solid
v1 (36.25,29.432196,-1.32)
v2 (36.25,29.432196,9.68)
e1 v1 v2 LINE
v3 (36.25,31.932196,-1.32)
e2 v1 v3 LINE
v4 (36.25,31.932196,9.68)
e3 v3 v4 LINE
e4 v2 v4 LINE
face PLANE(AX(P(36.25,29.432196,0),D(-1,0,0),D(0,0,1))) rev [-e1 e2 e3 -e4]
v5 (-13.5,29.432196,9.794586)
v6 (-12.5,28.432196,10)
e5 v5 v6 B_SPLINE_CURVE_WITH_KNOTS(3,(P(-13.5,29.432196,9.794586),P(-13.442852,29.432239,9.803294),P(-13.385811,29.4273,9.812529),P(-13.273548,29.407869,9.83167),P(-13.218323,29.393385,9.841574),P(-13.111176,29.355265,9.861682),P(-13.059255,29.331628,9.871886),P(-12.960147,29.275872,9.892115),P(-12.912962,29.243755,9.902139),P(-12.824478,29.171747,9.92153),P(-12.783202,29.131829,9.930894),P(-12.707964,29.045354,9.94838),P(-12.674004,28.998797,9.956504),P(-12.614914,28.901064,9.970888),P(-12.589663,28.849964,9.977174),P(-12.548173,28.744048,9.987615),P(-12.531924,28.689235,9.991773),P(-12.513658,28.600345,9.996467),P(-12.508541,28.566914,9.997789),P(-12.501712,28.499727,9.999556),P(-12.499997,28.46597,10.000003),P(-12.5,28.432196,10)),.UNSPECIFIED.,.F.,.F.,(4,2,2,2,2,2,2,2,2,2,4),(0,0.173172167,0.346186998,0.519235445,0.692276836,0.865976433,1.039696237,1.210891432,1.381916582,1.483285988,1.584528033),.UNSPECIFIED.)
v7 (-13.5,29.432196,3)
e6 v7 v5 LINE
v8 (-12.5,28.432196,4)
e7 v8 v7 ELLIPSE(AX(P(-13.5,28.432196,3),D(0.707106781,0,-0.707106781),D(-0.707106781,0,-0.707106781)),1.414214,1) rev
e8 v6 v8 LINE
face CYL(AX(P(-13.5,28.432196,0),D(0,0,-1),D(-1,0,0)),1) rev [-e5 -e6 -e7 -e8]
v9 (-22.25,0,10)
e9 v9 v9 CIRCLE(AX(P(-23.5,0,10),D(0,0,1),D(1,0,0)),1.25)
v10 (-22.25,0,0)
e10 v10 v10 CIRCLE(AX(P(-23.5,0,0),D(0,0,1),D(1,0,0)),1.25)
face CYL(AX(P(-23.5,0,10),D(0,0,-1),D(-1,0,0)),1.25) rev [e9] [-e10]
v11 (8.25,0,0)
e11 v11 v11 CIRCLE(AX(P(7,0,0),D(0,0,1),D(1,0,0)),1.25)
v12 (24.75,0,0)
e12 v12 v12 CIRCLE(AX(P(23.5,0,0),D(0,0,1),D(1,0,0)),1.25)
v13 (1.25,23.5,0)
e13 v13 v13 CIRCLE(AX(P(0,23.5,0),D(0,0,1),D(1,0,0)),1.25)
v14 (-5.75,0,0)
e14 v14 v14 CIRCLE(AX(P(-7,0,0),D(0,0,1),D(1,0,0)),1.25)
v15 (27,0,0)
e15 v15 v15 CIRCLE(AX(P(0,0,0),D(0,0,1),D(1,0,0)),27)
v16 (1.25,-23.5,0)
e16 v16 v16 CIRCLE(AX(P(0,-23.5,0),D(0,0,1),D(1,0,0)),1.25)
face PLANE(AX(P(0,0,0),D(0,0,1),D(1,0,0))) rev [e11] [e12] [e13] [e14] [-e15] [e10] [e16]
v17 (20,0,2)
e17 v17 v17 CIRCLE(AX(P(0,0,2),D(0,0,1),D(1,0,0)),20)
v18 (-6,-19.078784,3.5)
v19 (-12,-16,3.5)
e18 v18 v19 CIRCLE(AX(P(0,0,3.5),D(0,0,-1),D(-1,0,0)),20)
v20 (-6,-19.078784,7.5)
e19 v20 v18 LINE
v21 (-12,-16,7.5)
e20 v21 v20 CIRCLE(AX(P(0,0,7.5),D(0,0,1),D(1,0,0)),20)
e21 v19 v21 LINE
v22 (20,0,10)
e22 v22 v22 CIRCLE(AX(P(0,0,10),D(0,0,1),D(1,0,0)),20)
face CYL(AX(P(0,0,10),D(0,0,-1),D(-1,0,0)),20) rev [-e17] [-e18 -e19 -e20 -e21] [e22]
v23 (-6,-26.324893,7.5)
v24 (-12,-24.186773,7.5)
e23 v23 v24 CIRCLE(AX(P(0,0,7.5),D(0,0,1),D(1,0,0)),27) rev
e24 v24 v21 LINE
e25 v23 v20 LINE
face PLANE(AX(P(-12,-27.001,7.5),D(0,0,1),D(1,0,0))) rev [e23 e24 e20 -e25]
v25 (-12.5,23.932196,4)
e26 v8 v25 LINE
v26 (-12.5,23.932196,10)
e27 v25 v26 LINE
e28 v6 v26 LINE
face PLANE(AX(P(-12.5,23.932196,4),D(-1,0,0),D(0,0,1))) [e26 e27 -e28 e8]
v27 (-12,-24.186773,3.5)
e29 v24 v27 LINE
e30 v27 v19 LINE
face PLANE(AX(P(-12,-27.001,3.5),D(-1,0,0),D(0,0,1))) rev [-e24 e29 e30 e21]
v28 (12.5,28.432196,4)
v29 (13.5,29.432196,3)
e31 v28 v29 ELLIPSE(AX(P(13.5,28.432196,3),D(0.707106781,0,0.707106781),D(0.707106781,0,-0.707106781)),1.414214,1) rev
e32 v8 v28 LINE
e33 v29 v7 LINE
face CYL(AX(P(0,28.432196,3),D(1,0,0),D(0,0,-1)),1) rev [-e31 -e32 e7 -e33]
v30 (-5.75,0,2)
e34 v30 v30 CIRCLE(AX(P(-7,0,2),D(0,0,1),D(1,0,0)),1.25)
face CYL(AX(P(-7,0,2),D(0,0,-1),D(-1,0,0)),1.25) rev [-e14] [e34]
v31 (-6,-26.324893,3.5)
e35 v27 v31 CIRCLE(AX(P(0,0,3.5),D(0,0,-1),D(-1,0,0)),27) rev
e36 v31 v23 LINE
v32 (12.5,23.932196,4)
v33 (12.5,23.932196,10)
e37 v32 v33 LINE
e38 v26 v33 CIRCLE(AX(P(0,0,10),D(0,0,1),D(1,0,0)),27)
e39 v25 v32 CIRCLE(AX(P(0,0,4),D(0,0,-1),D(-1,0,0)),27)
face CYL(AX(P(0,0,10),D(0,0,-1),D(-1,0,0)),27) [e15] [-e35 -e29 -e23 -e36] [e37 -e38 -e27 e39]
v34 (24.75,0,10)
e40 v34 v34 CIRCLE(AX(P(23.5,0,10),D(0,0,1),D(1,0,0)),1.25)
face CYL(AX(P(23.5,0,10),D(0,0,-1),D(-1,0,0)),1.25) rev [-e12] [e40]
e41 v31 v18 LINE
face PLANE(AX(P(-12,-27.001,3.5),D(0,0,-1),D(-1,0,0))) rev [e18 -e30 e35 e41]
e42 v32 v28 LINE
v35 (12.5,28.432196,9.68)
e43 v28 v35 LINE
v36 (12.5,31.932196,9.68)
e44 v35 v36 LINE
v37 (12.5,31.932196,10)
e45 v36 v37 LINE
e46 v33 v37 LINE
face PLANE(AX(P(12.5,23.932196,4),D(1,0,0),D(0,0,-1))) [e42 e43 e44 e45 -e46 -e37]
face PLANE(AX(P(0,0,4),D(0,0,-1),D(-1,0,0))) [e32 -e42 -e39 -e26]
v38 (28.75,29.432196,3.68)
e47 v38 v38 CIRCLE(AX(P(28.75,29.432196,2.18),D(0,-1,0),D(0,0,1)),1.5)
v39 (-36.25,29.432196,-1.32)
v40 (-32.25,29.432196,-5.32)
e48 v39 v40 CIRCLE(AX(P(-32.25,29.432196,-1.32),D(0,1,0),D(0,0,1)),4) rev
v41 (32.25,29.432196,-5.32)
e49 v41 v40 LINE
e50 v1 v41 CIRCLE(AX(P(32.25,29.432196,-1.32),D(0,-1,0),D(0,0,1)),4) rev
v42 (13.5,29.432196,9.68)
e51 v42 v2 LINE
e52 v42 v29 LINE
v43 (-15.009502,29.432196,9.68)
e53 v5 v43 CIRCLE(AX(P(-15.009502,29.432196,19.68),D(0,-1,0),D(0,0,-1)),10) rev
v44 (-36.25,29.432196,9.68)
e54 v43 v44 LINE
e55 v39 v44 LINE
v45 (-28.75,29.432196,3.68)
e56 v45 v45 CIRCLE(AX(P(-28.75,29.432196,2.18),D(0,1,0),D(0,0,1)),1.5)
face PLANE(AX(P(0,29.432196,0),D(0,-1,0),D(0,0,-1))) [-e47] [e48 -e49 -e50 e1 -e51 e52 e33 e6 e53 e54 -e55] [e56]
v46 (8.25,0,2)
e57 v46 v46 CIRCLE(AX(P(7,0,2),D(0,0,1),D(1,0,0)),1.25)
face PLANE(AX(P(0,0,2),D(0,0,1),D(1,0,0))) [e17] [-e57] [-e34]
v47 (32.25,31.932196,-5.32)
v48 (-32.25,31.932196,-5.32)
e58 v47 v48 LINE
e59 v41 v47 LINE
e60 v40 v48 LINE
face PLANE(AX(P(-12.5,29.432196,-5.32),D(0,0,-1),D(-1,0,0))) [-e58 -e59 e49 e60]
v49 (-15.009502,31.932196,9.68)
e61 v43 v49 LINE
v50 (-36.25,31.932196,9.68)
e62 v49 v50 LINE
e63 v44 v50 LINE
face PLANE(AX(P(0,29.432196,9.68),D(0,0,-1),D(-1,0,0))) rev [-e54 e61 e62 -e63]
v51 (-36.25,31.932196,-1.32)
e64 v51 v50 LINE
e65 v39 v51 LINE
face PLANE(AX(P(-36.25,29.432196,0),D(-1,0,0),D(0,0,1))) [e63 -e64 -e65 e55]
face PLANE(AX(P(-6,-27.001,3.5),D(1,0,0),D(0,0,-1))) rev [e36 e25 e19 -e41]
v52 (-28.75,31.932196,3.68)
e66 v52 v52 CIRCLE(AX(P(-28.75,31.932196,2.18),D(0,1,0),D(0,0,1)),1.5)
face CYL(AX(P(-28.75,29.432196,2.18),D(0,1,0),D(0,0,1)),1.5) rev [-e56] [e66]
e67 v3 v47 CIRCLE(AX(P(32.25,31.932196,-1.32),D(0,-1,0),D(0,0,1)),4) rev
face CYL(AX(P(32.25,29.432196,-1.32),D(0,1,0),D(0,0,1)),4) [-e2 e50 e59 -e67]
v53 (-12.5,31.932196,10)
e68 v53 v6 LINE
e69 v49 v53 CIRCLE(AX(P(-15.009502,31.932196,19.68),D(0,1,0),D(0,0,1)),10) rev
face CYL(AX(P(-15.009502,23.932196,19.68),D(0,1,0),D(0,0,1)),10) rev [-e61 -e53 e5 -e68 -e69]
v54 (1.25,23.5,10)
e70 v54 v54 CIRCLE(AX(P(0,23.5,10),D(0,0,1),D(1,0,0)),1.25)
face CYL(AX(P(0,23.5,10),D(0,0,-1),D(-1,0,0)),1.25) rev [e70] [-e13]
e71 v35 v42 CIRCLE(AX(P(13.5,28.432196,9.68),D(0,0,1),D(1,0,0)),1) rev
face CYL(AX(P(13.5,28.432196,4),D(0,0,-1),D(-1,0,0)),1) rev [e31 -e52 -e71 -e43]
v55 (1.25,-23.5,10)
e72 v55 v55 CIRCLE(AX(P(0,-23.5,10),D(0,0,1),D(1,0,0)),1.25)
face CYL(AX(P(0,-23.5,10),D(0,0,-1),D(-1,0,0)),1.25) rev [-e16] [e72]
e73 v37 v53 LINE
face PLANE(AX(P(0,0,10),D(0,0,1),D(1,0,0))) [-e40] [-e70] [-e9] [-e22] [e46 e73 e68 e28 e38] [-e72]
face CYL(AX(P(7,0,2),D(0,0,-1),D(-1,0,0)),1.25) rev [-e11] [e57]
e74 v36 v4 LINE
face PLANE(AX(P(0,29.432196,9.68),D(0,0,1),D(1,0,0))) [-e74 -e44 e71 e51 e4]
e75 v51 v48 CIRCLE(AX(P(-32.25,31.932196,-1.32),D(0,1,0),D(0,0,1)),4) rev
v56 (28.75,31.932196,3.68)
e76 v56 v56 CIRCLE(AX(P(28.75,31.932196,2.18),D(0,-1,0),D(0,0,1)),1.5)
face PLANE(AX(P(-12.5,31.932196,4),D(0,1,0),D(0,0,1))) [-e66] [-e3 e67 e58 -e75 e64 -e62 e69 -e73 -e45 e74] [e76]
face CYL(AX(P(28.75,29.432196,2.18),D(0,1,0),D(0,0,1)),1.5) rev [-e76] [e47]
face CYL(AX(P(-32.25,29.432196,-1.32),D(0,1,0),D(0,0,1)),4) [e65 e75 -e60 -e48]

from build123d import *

# Parameters (mm, degrees)
SKETCH1_R               = 27
SKETCH1_R_2             = 1.25
SKETCH1_R_3             = 20
BOSS_EXTRUDE1_DEPTH     = 10
SKETCH3_R               = 20
SKETCH3_R_2             = 1.25
BOSS_EXTRUDE2_DEPTH     = 2
BOSS_EXTRUDE3_DEPTH     = 6
CUT_EXTRUDE1_REACH      = 44.996
CUT_EXTRUDE1_END_RADIUS = 27
SKETCH4_W               = 6
SKETCH4_H               = 4
SKETCH6_W               = 25
SKETCH6_H               = 15.32
BOSS_EXTRUDE4_DEPTH     = 2.5
SKETCH7_R               = 1.5
BOSS_EXTRUDE5_DEPTH     = 2.5
FILLET2_R               = 10
FILLET3_R               = 1


with BuildPart() as part:
    # Sketch1 → Boss-Extrude1 (new body)
    with BuildSketch(Plane.XY):
        Circle(SKETCH1_R)
        with Locations((0, 23.5)):
            Circle(SKETCH1_R_2, mode=Mode.SUBTRACT)
        with Locations((23.5, 0)):
            Circle(SKETCH1_R_2, mode=Mode.SUBTRACT)
        with Locations((0, -23.5)):
            Circle(SKETCH1_R_2, mode=Mode.SUBTRACT)
        with Locations((-23.5, 0)):
            Circle(SKETCH1_R_2, mode=Mode.SUBTRACT)
        Circle(SKETCH1_R_3, mode=Mode.SUBTRACT)
    extrude(amount=BOSS_EXTRUDE1_DEPTH)

    # Sketch3 → Boss-Extrude2 (add)
    with BuildSketch(Plane.XY):
        Circle(SKETCH3_R)
        with Locations((-7, 0)):
            Circle(SKETCH3_R_2, mode=Mode.SUBTRACT)
        with Locations((7, 0)):
            Circle(SKETCH3_R_2, mode=Mode.SUBTRACT)
    extrude(amount=BOSS_EXTRUDE2_DEPTH)

    # Sketch5 → Boss-Extrude3 (add)
    with BuildSketch(Plane.XY.offset(10)):
        Polygon((-12.5, 23.932195888), (-4.251935746, 23.932195888), (0, 26.25446737), (4.267780323, 23.932195888), (12.5, 23.932195888), (12.5, 31.932195888), (-12.5, 31.932195888), align=None)
    extrude(amount=-BOSS_EXTRUDE3_DEPTH)

    # Cut-Extrude1: up to this cylinder (the profile starts inside it)
    cut_extrude1_end = Plane(origin=(0, 0, 5.5), z_dir=(0, 0, -1)) * Cylinder(CUT_EXTRUDE1_END_RADIUS, 144.992, mode=Mode.PRIVATE)
    # Sketch4 → Cut-Extrude1 (cut, up to the surface)
    with BuildSketch(Plane(origin=(0, 0, 0), x_dir=(1, 0, 0), z_dir=(0, 1, 0)), mode=Mode.PRIVATE) as cut_extrude1_sk1:
        with Locations((-9, -5.5)):
            Rectangle(SKETCH4_W, SKETCH4_H)
    cut_extrude1_tool1 = extrude(cut_extrude1_sk1.sketch, amount=-CUT_EXTRUDE1_REACH, mode=Mode.PRIVATE) & cut_extrude1_end
    add(cut_extrude1_tool1.solids().sort_by_distance((-9, 0, 5.5))[0], mode=Mode.SUBTRACT)

    # Sketch6 → Boss-Extrude4 (add)
    with BuildSketch(Plane(origin=(0, 31.932195888, 0), x_dir=(1, 0, 0), z_dir=(0, 1, 0))):
        with Locations((0, -2.34)):
            Rectangle(SKETCH6_W, SKETCH6_H)
    boss_extrude4 = extrude(amount=-BOSS_EXTRUDE4_DEPTH)

    # Sketch7 → Boss-Extrude5 (add)
    with BuildSketch(Plane(origin=(0, 31.932195888, 0), x_dir=(1, 0, 0), z_dir=(0, 1, 0))):
        with BuildLine():
            Line((-36.25, -9.68), (-28.75, -9.68))
            Line((-28.75, -9.68), (0, -9.68))
            Line((0, -9.68), (0, 5.32))
            Line((0, 5.32), (-32.25, 5.32))
            ThreePointArc((-32.25, 5.32), (-35.078427125, 4.148427125), (-36.25, 1.32))
            Line((-36.25, 1.32), (-36.25, -2.18))
            Line((-36.25, -2.18), (-36.25, -9.68))
        make_face()
        with Locations(Location((-28.75, -2.18, 0), (0, 0, 270))):
            Circle(SKETCH7_R, mode=Mode.SUBTRACT)
    boss_extrude5 = extrude(amount=-BOSS_EXTRUDE5_DEPTH)

    # Fillet2
    # the kernel refuses this fillet: 10 mm, written as the material it adds along each edge
    with BuildSketch(Plane(origin=(-12.5, 29.432195888, 9.68), x_dir=(-1, 0, 0), z_dir=(0, 1, 0))) as fillet2_piece_1:
        with BuildLine():
            CenterArc((2.509501943, 10), FILLET2_R, 255.466253099, 14.533746901)
            Line((0, 0.32), (-0.050190039, 0.1264))
            ThreePointArc((-0.050190039, 0.1264), (-0.2, 0.16), (-0.2, 0))
            Line((-0.2, 0), (0, -0.2))
            Line((0, -0.2), (2.509501943, -0.2))
            Line((2.509501943, -0.2), (2.509501943, 0))
        make_face()
    extrude(amount=2.5)

    # Mirror1: Boss-Extrude4, Boss-Extrude5 across plane
    add(boss_extrude4.mirror(Plane(origin=(0, 0, 0), x_dir=(0, 0, 1), z_dir=(1, 0, 0))))
    add(boss_extrude5.mirror(Plane(origin=(0, 0, 0), x_dir=(0, 0, 1), z_dir=(1, 0, 0))))

    # Fillet3
    # the kernel refuses this fillet: 1 mm, written as the material it adds along each edge
    with BuildSketch(Plane(origin=(-12.5, 29.432195888, 4), x_dir=(0, -1, 0), z_dir=(0, 0, 1))) as fillet3_piece_1_section:
        with BuildLine():
            CenterArc((FILLET3_R, -FILLET3_R), FILLET3_R, 90, 90)
            Line((0, -FILLET3_R), (0, 0))
            Line((0, 0), (FILLET3_R, 0))
        make_face()
    fillet3_piece_1 = extrude(amount=6, mode=Mode.PRIVATE)
    fillet3_piece_1 = fillet3_piece_1 - Plane(origin=(-15.009501943, 29.204760134, 19.68), x_dir=(-1, 0, 0), z_dir=(0, -1, 0)) * Cylinder(10, 16, mode=Mode.PRIVATE)
    add(fillet3_piece_1)
    with BuildSketch(Plane(origin=(12.5, 29.432195888, 9.68), x_dir=(0, -1, 0), z_dir=(0, 0, -1))) as fillet3_piece_2:
        with BuildLine():
            CenterArc((FILLET3_R, -FILLET3_R), FILLET3_R, 90, 90)
            Line((0, -FILLET3_R), (0, 0))
            Line((0, 0), (FILLET3_R, 0))
        make_face()
    extrude(amount=5.68)
    with BuildSketch(Plane(origin=(12.5, 29.432195888, 4), x_dir=(0, -1, 0), z_dir=(-1, 0, 0))) as fillet3_piece_3:
        with BuildLine():
            CenterArc((FILLET3_R, -FILLET3_R), FILLET3_R, 90, 90)
            Line((0, -FILLET3_R), (0, 0))
            Line((0, 0), (FILLET3_R, 0))
        make_face()
    extrude(amount=25)
    with BuildSketch(Plane(origin=(-12.5, 29.432195888, 1.5), x_dir=(0, -1, 0), z_dir=(0, 0, 1))) as fillet3_piece_4a_section:
        with BuildLine():
            CenterArc((FILLET3_R, -FILLET3_R), FILLET3_R, 90, 90)
            Line((0, -FILLET3_R), (0, 0))
            Line((0, 0), (FILLET3_R, 0))
        make_face()
    fillet3_piece_4a = extrude(amount=8.5, mode=Mode.PRIVATE)
    fillet3_piece_4a = split(fillet3_piece_4a, bisect_by=Plane(origin=(-12.726395114, 29.205800773, 4), z_dir=(0, 0, -1)), keep=Keep.TOP, mode=Mode.PRIVATE)
    with BuildSketch(Plane(origin=(12.5, 29.432195888, 4), x_dir=(0, -1, 0), z_dir=(-1, 0, 0))) as fillet3_piece_4b_section:
        with BuildLine():
            CenterArc((FILLET3_R, -FILLET3_R), FILLET3_R, 90, 90)
            Line((0, -FILLET3_R), (0, 0))
            Line((0, 0), (FILLET3_R, 0))
        make_face()
    fillet3_piece_4b = extrude(amount=27.5, mode=Mode.PRIVATE)
    fillet3_piece_4b = split(fillet3_piece_4b, bisect_by=Plane(origin=(-12.5, 29.205800773, 3.773604886), z_dir=(-1, 0, 0)), keep=Keep.TOP, mode=Mode.PRIVATE)
    fillet3_piece_4 = fillet3_piece_4a & fillet3_piece_4b
    add(fillet3_piece_4)
    with BuildSketch(Plane(origin=(12.5, 29.432195888, 9.68), x_dir=(0, -1, 0), z_dir=(0, 0, -1))) as fillet3_piece_5a_section:
        with BuildLine():
            CenterArc((FILLET3_R, -FILLET3_R), FILLET3_R, 90, 90)
            Line((0, -FILLET3_R), (0, 0))
            Line((0, 0), (FILLET3_R, 0))
        make_face()
    fillet3_piece_5a = extrude(amount=8.18, mode=Mode.PRIVATE)
    fillet3_piece_5a = split(fillet3_piece_5a, bisect_by=Plane(origin=(12.726395114, 29.205800773, 4), z_dir=(0, 0, -1)), keep=Keep.TOP, mode=Mode.PRIVATE)
    with BuildSketch(Plane(origin=(15, 29.432195888, 4), x_dir=(0, -1, 0), z_dir=(-1, 0, 0))) as fillet3_piece_5b_section:
        with BuildLine():
            CenterArc((FILLET3_R, -FILLET3_R), FILLET3_R, 90, 90)
            Line((0, -FILLET3_R), (0, 0))
            Line((0, 0), (FILLET3_R, 0))
        make_face()
    fillet3_piece_5b = extrude(amount=27.5, mode=Mode.PRIVATE)
    fillet3_piece_5b = split(fillet3_piece_5b, bisect_by=Plane(origin=(12.5, 29.205800773, 3.773604886), z_dir=(1, 0, 0)), keep=Keep.TOP, mode=Mode.PRIVATE)
    fillet3_piece_5 = fillet3_piece_5a & fillet3_piece_5b
    add(fillet3_piece_5)


solid = part.part
